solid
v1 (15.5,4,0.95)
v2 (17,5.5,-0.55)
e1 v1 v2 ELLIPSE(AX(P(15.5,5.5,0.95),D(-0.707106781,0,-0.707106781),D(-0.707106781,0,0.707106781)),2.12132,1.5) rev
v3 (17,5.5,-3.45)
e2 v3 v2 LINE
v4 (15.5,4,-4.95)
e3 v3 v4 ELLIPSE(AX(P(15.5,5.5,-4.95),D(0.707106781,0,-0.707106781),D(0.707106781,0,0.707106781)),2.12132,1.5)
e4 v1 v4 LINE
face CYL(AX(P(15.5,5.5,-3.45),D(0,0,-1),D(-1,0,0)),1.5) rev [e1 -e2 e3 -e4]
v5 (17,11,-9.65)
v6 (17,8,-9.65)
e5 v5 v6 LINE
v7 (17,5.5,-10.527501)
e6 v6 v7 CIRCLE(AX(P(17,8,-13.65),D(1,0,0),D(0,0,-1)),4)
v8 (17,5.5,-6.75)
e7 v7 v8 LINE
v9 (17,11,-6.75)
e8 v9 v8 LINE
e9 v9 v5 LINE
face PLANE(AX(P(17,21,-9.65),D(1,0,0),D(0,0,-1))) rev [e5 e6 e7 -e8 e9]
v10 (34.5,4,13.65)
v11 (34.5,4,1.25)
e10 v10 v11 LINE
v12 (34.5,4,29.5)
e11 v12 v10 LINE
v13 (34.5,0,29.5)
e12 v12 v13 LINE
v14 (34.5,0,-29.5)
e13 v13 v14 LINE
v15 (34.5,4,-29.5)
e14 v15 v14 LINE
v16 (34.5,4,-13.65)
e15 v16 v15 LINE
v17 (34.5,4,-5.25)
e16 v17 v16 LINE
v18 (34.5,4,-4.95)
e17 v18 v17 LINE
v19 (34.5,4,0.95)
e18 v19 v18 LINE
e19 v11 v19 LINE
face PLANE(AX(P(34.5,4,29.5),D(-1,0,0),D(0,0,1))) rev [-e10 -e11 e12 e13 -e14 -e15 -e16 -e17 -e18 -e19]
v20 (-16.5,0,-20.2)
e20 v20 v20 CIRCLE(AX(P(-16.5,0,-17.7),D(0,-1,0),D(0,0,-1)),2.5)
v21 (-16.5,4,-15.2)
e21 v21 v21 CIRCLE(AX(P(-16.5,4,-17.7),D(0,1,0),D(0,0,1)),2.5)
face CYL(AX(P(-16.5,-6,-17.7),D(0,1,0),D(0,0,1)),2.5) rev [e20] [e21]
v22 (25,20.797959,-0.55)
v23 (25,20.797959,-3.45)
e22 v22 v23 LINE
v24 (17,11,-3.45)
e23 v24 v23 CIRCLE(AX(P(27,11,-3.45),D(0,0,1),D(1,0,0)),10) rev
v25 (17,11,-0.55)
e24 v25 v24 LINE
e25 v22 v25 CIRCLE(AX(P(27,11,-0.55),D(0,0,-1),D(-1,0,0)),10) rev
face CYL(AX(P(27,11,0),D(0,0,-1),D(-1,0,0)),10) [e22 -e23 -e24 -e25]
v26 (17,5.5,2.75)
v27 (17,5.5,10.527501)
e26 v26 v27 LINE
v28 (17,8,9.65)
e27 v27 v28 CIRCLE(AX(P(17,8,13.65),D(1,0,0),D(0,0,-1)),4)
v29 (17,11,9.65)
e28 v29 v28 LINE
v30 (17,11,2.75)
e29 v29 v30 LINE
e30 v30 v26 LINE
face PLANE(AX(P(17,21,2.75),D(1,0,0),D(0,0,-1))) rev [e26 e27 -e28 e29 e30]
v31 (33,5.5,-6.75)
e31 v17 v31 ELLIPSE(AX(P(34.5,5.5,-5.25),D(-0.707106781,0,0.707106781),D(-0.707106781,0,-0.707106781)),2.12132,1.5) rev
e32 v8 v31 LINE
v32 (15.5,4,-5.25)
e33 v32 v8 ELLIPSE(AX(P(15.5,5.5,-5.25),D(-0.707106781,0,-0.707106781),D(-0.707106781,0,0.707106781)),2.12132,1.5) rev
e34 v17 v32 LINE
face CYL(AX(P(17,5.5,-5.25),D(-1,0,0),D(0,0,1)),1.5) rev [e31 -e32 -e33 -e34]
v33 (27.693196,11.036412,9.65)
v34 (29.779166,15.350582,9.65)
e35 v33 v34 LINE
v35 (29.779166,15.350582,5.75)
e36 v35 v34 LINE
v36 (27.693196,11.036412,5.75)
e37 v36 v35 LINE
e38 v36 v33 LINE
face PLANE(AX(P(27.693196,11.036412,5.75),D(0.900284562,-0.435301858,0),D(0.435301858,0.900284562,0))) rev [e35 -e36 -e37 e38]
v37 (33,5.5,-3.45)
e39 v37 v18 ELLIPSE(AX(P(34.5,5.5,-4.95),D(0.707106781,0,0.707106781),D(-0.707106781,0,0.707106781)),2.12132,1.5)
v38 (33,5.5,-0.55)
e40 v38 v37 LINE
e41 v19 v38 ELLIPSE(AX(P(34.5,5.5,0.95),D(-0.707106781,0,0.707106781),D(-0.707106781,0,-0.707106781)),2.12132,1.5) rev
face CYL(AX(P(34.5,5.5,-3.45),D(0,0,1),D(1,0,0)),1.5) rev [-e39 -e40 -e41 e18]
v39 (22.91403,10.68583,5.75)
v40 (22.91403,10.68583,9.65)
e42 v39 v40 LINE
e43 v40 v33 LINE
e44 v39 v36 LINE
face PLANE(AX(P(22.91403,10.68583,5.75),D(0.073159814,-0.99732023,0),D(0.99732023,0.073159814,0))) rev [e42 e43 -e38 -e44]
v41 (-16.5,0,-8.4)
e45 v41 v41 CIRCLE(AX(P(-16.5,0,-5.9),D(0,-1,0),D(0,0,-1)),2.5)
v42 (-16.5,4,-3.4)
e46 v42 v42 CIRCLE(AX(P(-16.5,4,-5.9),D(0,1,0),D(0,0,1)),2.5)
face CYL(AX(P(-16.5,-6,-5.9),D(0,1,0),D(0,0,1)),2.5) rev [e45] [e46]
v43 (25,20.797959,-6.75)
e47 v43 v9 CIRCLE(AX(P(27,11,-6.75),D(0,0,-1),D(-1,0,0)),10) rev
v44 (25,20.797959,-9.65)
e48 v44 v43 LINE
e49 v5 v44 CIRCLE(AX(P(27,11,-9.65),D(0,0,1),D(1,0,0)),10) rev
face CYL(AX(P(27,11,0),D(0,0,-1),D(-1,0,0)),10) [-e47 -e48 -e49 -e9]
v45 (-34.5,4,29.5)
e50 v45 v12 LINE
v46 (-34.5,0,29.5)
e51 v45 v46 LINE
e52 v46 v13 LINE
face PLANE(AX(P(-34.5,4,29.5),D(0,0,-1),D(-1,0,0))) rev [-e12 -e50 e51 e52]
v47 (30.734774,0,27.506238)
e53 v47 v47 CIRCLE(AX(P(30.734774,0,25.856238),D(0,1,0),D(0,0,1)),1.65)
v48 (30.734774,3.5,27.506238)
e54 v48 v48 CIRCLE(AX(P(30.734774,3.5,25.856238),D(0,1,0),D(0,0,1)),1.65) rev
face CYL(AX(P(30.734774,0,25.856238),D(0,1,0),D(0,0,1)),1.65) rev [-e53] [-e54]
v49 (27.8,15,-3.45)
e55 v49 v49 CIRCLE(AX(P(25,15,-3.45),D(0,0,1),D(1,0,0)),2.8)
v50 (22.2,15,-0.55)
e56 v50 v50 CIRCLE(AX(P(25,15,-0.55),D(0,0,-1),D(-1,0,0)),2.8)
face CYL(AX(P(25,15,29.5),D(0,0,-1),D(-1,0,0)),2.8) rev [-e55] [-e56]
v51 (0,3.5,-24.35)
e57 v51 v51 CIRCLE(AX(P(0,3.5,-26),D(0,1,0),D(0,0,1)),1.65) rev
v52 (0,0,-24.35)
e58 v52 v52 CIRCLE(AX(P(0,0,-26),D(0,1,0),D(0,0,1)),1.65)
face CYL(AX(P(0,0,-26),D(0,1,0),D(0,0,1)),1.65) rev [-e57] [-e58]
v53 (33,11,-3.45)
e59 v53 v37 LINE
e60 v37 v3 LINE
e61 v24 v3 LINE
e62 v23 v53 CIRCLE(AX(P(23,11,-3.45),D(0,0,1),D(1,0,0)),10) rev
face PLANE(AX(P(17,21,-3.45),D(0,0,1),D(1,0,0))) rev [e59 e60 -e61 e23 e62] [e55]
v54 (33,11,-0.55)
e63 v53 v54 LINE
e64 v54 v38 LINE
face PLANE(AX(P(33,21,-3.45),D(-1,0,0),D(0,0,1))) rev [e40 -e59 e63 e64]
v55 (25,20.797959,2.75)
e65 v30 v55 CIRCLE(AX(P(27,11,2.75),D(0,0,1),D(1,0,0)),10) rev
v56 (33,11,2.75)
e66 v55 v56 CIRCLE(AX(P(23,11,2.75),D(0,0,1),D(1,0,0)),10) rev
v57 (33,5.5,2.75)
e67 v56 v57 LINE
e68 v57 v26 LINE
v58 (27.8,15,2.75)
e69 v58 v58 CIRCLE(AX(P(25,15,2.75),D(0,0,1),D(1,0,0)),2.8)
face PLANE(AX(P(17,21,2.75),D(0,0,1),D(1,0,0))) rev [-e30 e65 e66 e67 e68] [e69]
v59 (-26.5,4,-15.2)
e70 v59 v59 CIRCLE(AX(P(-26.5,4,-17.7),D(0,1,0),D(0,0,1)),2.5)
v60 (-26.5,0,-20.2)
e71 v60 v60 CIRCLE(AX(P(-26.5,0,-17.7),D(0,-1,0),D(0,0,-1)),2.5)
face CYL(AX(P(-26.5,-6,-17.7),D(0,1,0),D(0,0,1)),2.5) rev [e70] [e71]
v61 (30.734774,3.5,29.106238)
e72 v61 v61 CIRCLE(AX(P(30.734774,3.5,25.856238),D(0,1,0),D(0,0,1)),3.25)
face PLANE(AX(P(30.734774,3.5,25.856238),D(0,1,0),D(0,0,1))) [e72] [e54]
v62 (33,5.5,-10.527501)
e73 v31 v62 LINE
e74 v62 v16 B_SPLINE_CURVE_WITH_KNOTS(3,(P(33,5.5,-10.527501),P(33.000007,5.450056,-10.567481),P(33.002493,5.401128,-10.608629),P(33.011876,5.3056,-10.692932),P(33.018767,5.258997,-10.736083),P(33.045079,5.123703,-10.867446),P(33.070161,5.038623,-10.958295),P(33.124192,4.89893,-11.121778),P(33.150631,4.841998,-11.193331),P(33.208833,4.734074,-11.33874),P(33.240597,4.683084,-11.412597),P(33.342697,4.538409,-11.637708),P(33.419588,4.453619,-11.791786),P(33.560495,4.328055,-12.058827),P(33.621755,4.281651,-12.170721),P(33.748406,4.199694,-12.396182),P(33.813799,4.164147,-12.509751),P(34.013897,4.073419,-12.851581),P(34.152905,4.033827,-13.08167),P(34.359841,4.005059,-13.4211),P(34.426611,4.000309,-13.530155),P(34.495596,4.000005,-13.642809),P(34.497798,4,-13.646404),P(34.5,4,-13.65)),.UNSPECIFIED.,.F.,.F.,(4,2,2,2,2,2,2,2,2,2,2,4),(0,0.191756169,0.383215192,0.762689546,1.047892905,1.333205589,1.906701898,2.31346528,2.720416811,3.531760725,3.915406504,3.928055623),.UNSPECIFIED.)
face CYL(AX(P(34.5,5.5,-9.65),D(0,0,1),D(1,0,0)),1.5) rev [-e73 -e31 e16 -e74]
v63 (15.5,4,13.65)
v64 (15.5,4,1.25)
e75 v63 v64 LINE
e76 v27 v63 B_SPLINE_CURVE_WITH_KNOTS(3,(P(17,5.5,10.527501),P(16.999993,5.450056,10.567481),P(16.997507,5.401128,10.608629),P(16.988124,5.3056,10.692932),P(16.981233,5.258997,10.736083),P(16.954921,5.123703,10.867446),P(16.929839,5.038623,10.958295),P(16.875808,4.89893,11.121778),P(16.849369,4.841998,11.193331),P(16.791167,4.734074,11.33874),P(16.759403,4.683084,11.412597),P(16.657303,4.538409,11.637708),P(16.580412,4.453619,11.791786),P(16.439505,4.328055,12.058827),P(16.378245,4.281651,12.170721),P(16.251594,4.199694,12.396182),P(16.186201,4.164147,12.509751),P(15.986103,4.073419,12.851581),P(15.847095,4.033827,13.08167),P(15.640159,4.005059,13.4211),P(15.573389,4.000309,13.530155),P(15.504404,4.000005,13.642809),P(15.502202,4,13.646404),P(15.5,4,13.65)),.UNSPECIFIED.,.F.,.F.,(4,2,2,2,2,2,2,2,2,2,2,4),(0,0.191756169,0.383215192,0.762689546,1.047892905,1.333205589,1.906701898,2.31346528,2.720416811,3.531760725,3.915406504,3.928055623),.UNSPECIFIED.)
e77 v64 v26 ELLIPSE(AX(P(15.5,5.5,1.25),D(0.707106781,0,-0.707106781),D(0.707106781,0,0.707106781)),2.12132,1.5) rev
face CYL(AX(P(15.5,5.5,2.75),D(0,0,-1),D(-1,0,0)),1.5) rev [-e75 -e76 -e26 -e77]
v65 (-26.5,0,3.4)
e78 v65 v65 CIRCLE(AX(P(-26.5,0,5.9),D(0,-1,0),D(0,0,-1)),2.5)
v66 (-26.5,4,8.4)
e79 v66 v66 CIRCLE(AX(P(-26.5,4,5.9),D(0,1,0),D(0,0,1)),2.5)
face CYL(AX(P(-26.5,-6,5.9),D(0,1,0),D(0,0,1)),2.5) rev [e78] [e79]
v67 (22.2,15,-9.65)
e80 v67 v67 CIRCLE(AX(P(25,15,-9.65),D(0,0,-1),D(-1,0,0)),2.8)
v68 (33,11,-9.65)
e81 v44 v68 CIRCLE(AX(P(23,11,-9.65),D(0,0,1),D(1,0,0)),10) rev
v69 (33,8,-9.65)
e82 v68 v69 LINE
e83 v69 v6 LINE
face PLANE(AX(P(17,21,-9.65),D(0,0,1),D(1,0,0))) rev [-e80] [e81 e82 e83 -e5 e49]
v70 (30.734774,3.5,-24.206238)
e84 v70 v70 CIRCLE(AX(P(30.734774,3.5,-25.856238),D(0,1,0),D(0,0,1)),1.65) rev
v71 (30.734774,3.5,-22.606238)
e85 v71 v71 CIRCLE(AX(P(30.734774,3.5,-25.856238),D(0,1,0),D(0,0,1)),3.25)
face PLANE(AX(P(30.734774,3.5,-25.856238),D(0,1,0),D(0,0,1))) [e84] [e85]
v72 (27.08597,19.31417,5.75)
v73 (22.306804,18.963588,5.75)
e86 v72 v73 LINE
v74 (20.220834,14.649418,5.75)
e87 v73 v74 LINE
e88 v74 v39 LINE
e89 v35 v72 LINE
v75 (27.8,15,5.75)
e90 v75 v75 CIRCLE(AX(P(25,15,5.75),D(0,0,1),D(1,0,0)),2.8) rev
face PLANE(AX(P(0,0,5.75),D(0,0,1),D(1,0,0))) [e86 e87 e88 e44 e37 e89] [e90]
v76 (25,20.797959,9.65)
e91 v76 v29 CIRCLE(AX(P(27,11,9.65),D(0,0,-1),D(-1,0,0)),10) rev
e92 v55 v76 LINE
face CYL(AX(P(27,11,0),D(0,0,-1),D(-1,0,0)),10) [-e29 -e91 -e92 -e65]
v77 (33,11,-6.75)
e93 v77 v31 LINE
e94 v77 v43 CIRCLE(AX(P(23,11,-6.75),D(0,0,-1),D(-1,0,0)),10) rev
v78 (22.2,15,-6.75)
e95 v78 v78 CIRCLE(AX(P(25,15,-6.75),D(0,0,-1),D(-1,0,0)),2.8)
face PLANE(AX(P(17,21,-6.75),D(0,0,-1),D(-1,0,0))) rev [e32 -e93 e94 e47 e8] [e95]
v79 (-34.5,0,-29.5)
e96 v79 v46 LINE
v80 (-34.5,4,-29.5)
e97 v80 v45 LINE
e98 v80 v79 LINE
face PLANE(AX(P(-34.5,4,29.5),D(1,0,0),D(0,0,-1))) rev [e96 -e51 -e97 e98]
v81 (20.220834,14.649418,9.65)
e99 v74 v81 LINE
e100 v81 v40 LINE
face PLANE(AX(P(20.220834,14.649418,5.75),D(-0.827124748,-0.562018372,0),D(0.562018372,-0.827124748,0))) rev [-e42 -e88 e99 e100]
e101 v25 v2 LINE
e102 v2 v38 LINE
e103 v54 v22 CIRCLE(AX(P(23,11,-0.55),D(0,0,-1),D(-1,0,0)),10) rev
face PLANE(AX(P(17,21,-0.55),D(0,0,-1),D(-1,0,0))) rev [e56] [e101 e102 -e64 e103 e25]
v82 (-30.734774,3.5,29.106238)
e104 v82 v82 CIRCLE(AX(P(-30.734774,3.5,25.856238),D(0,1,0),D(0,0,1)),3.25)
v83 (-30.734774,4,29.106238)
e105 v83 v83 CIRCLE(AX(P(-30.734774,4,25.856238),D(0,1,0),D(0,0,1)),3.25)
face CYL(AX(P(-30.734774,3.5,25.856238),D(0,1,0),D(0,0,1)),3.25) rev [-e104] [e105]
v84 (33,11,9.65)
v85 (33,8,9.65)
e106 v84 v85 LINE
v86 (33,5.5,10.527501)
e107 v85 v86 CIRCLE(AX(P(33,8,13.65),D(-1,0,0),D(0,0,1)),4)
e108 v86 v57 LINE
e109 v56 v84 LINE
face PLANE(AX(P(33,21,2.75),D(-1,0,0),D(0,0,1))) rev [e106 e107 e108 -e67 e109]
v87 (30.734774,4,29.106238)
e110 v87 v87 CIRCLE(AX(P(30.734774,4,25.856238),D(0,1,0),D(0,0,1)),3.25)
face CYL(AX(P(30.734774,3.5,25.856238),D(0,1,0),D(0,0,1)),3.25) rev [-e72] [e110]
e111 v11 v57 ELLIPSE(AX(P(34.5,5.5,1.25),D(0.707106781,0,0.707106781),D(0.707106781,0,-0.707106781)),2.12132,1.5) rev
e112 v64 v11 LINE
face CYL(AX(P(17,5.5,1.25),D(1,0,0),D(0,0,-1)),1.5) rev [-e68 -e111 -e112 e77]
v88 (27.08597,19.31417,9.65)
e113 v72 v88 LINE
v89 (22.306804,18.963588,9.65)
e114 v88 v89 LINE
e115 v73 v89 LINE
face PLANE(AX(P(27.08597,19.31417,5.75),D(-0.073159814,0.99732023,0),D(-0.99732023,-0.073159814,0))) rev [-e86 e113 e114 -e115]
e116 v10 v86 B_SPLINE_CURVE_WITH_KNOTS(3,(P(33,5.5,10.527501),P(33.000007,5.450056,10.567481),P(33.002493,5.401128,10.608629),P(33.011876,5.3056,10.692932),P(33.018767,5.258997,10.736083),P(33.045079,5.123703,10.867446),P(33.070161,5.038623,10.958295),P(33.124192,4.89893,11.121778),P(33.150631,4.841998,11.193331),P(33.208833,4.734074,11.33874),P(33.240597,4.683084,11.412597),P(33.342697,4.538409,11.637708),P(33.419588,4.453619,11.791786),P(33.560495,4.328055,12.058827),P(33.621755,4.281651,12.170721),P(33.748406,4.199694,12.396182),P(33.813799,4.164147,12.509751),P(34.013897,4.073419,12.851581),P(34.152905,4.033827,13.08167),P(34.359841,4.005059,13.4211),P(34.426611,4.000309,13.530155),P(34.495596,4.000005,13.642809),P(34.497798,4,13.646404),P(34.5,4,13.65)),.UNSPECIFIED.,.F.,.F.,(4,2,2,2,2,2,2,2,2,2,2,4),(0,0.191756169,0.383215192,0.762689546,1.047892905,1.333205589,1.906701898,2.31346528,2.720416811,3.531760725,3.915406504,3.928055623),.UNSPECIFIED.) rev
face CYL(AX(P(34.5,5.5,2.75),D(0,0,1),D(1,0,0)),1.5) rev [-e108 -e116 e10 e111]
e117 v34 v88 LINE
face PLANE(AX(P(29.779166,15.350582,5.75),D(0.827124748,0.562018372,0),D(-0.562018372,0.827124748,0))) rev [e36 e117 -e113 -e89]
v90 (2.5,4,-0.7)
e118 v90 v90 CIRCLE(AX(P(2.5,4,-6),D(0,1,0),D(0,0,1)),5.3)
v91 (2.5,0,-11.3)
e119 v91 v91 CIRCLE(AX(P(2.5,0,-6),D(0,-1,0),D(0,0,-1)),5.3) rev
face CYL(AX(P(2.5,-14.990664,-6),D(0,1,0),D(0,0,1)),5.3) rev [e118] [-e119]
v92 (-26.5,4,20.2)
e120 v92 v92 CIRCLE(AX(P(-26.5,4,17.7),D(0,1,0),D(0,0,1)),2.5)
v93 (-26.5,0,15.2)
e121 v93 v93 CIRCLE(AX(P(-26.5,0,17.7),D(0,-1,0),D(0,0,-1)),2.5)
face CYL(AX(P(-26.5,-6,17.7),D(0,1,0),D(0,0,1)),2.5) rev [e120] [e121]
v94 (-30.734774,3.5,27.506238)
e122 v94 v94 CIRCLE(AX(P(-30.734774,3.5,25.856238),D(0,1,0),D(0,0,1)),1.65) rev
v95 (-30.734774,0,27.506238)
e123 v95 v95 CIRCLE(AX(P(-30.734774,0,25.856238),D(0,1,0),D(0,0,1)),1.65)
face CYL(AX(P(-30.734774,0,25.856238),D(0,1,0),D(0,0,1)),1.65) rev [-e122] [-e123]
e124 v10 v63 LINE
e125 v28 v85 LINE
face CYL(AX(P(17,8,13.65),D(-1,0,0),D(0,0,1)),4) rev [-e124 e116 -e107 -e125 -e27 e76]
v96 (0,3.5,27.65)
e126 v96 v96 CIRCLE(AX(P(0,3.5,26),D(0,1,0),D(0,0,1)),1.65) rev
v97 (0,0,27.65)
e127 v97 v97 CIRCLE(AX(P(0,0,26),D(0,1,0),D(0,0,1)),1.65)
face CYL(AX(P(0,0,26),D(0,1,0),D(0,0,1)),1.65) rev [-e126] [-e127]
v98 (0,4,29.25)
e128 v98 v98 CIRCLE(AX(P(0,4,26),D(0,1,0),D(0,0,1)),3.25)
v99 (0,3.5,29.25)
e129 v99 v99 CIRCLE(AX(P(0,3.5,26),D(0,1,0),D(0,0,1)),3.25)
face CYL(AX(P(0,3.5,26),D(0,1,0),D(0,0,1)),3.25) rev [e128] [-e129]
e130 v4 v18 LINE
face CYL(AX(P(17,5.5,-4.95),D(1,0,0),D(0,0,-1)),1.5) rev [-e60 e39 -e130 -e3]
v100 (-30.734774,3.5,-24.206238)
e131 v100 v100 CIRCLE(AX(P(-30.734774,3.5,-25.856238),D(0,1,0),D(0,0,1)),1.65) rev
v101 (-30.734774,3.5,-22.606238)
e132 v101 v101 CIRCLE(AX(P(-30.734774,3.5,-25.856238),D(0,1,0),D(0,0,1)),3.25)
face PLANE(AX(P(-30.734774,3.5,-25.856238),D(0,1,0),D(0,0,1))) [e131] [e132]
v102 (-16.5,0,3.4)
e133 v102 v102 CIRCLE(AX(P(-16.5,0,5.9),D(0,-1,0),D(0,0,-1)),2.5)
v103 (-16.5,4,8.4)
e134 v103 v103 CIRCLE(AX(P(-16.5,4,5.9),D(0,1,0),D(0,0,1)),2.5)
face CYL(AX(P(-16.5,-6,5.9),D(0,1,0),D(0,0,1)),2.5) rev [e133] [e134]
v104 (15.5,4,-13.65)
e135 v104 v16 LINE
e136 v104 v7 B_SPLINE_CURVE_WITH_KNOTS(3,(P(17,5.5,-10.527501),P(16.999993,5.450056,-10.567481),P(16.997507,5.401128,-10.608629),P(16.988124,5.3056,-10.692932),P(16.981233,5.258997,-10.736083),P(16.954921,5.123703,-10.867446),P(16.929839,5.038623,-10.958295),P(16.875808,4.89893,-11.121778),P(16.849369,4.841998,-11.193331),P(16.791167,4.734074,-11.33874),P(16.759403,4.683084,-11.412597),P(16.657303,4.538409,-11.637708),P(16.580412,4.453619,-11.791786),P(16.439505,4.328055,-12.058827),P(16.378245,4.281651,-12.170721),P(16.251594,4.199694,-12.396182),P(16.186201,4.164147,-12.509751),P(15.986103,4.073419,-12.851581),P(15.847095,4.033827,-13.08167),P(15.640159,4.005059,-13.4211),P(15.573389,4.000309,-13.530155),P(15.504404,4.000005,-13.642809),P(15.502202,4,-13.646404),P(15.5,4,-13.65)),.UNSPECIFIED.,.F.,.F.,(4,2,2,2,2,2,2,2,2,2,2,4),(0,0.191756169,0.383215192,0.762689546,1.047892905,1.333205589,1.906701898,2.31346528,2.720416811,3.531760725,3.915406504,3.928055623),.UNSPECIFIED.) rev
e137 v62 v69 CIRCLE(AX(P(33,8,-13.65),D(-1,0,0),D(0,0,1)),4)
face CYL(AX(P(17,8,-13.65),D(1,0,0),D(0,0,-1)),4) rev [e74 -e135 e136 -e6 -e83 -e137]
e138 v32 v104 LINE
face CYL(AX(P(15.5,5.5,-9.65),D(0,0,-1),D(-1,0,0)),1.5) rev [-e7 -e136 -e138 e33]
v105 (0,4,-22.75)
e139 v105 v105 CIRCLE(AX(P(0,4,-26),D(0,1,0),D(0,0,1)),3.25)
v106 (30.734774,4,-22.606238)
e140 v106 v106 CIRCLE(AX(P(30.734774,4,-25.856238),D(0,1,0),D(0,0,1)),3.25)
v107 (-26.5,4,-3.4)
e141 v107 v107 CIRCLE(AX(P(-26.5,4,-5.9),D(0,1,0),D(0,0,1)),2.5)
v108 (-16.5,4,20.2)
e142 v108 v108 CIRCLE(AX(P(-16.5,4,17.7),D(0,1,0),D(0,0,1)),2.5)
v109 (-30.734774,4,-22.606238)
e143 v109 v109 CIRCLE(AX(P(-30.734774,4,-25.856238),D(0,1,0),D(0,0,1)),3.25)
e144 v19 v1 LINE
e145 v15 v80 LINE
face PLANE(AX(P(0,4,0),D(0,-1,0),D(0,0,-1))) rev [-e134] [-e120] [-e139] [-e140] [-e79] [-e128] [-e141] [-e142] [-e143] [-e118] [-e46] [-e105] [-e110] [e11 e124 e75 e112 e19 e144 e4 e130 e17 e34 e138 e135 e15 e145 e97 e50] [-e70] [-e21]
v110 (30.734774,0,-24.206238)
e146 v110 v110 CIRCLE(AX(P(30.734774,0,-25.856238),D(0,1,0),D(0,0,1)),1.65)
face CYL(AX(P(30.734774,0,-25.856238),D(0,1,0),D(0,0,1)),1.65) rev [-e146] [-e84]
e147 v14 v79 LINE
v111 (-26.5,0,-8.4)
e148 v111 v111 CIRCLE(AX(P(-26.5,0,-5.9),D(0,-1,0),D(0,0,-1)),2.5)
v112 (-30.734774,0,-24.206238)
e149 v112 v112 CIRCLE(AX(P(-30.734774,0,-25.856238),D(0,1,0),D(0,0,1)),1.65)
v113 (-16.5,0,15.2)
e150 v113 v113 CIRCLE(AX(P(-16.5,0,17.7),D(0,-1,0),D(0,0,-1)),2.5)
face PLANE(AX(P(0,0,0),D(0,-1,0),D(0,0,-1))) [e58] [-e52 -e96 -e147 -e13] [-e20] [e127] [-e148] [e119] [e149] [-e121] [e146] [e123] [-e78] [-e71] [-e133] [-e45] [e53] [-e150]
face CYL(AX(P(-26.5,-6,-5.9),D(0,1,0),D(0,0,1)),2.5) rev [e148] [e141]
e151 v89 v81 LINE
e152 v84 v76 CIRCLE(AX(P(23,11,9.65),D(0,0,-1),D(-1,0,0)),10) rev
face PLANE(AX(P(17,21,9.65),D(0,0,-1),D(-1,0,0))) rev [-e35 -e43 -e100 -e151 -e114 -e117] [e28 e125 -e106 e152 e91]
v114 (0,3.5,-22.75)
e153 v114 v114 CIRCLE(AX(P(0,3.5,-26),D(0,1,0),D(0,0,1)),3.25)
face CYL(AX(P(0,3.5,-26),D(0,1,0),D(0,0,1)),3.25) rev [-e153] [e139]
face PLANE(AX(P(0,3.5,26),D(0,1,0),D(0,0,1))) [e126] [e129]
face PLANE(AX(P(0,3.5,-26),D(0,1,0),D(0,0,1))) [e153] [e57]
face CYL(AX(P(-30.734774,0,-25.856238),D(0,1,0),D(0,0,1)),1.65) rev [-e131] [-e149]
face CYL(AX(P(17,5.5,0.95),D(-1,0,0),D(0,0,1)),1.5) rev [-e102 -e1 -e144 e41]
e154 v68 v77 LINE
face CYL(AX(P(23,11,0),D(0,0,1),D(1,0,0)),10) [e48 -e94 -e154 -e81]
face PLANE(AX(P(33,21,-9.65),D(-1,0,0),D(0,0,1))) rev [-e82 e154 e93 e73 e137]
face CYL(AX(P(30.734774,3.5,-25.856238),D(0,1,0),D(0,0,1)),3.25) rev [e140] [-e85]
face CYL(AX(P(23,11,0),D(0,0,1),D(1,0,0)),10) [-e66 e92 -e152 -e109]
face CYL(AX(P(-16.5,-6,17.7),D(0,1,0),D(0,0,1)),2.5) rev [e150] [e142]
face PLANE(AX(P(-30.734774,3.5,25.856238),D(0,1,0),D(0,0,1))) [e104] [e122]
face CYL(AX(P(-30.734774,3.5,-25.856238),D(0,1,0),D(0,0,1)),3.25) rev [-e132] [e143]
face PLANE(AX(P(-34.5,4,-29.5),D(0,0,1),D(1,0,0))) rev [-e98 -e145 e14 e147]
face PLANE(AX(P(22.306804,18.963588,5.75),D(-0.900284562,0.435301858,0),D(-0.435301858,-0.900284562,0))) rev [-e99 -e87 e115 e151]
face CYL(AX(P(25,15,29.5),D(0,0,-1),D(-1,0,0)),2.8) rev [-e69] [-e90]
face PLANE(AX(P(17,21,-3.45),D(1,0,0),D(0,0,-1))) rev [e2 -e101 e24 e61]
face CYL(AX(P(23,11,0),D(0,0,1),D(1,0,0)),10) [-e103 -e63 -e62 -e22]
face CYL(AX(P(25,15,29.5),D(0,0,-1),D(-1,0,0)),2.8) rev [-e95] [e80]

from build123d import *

# Parameters (mm, degrees)
SKETCH_1_W          = 69
SKETCH_1_H          = 59
EXTRUDE_1_DEPTH     = 4
SKETCH_2_R          = 1.65
CUT_EXTRUDE_1_DEPTH = 4
SKETCH_3_R          = 3.25
CUT_EXTRUDE_2_DEPTH = 0.5
SKETCH_4_W          = 16
SKETCH_4_H          = 2.9
SKETCH_4_H_2        = 6.9
EXTRUDE_2_DEPTH     = 17
SKETCH_5_R          = 2.8
CUT_EXTRUDE_3_DEPTH = 57.249199994
FILLET_1_R          = 10
FILLET_2_R          = 4
CUT_EXTRUDE_4_DEPTH = 3.9
FILLET_3_R          = 1.5
SKETCH_7_R          = 5.3
CUT_EXTRUDE_5_DEPTH = 4
SKETCH_8_R          = 2.5
CUT_EXTRUDE_6_DEPTH = 10


# Some blends are built 0.0001 mm under size
with BuildPart() as part:
    # Эскиз1 → Бобышка-Вытянуть1 (new body)
    with BuildSketch(Plane(origin=(0, 0, 0), x_dir=(1, 0, 0), z_dir=(0, 1, 0))):
        Rectangle(SKETCH_1_W, SKETCH_1_H)
    extrude(amount=EXTRUDE_1_DEPTH)

    # Эскиз2 → Вырез-Вытянуть1 (cut)
    with BuildSketch(Plane(origin=(0, 4, 0), x_dir=(1, 0, 0), z_dir=(0, 1, 0))):
        with Locations(Location((-30.734773913, -25.856238371, 0), (0, 0, 270))):
            Circle(SKETCH_2_R)
        with Locations(Location((-30.734773913, 25.856238371, 0), (0, 0, 270))):
            Circle(SKETCH_2_R)
        with Locations(Location((0, 26, 0), (0, 0, 270))):
            Circle(SKETCH_2_R)
        with Locations(Location((30.734773913, 25.856238371, 0), (0, 0, 270))):
            Circle(SKETCH_2_R)
        with Locations(Location((30.734773913, -25.856238371, 0), (0, 0, 270))):
            Circle(SKETCH_2_R)
        with Locations(Location((0, -26, 0), (0, 0, 270))):
            Circle(SKETCH_2_R)
    extrude(amount=-CUT_EXTRUDE_1_DEPTH, mode=Mode.SUBTRACT)

    # Эскиз3 → Вырез-Вытянуть2 (cut)
    with BuildSketch(Plane(origin=(0, 4, 0), x_dir=(1, 0, 0), z_dir=(0, 1, 0))):
        with Locations(Location((-30.734773913, 25.856238371, 0), (0, 0, 270))):
            Circle(SKETCH_3_R)
        with Locations(Location((0, 26, 0), (0, 0, 270))):
            Circle(SKETCH_3_R)
        with Locations(Location((30.734773913, 25.856238371, 0), (0, 0, 270))):
            Circle(SKETCH_3_R)
        with Locations(Location((30.734773913, -25.856238371, 0), (0, 0, 270))):
            Circle(SKETCH_3_R)
        with Locations(Location((0, -26, 0), (0, 0, 270))):
            Circle(SKETCH_3_R)
        with Locations(Location((-30.734773913, -25.856238371, 0), (0, 0, 270))):
            Circle(SKETCH_3_R)
    extrude(amount=-CUT_EXTRUDE_2_DEPTH, mode=Mode.SUBTRACT)

    # Эскиз4 → Бобышка-Вытянуть2 (add)
    with BuildSketch(Plane(origin=(0, 4, 0), x_dir=(1, 0, 0), z_dir=(0, 1, 0))):
        with Locations((25, 8.2)):
            Rectangle(SKETCH_4_W, SKETCH_4_H)
        with Locations((25, 2)):
            Rectangle(SKETCH_4_W, SKETCH_4_H)
        with Locations((25, -6.2)):
            Rectangle(SKETCH_4_W, SKETCH_4_H_2)
    extrude(amount=EXTRUDE_2_DEPTH)

    # Эскиз5 → Вырез-Вытянуть3 (cut, through all)
    with BuildSketch(Plane(origin=(0, 0, -9.65), x_dir=(-1, 0, 0), z_dir=(0, 0, -1))):
        with Locations((-25, 15)):
            Circle(SKETCH_5_R)
    extrude(amount=-CUT_EXTRUDE_3_DEPTH, mode=Mode.SUBTRACT)

    # Скругление1
    # the kernel refuses this fillet: 10 mm, written as the material it takes off along each edge
    with BuildSketch(Plane(origin=(33, 21, -34.65), x_dir=(0, -1, 0), z_dir=(0, 0, 1)), Plane(origin=(17, 21, 18.25), x_dir=(0, -1, 0), z_dir=(0, 0, -1)), Plane(origin=(17, 21, 24.45), x_dir=(0, -1, 0), z_dir=(0, 0, -1)), Plane(origin=(33, 21, -28.45), x_dir=(0, -1, 0), z_dir=(0, 0, 1))) as fillet_1_piece_1:
        with BuildLine():
            CenterArc((FILLET_1_R, -FILLET_1_R), FILLET_1_R, 90, 90)
            Line((0, -FILLET_1_R), (0, 0))
            Line((0, 0), (FILLET_1_R, 0))
        make_face()
    extrude(amount=52.9, mode=Mode.SUBTRACT)
    with BuildSketch(Plane(origin=(33, 21, -22.25), x_dir=(0, -1, 0), z_dir=(0, 0, 1)), Plane(origin=(17, 21, 34.65), x_dir=(0, -1, 0), z_dir=(0, 0, -1))) as fillet_1_piece_2:
        with BuildLine():
            CenterArc((FILLET_1_R, -FILLET_1_R), FILLET_1_R, 90, 90)
            Line((0, -FILLET_1_R), (0, 0))
            Line((0, 0), (FILLET_1_R, 0))
        make_face()
    extrude(amount=56.9, mode=Mode.SUBTRACT)

    # Скругление2
    fillet_2_edges = [part.edges().sort_by_distance(p)[0] for p in [
        (25, 4, 9.65),
        (25, 4, -9.65),
    ]]
    fillet(fillet_2_edges, radius=FILLET_2_R)

    # Эскиз6 → Вырез-Вытянуть4 (cut)
    with BuildSketch(Plane.XY.offset(9.65)):
        Polygon((20.220834242, 14.649417644), (22.914030347, 10.685829867), (27.693196105, 11.036412222), (29.779165758, 15.350582356), (27.085969653, 19.314170133), (22.306803895, 18.963587778), align=None)
    extrude(amount=-CUT_EXTRUDE_4_DEPTH, mode=Mode.SUBTRACT)

    # Скругление3
    fillet_3_edges = [part.edges().sort_by_distance(p)[0] for p in [
        (33, 4, 8.2),
        (25, 4, 2.75),
        (17, 4, 8.2),
        (33, 4, -10.2),
        (17, 4, -10.2),
        (25, 4, -6.75),
        (33, 4, -2),
        (25, 4, -3.45),
        (17, 4, -2),
        (25, 4, -0.55),
    ]]
    fillet(fillet_3_edges, radius=FILLET_3_R - 0.0001)  # a hair under: the kernel refuses the full size

    # Эскиз7 → Вырез-Вытянуть5 (cut)
    with BuildSketch(Plane(origin=(0, 4, 0), x_dir=(1, 0, 0), z_dir=(0, 1, 0))):
        with Locations(Location((2.5, 6, 0), (0, 0, 270))):
            Circle(SKETCH_7_R)
    extrude(amount=-CUT_EXTRUDE_5_DEPTH, mode=Mode.SUBTRACT)

    # Эскиз8 → Вырез-Вытянуть6 (cut)
    with BuildSketch(Plane(origin=(0, 4, 0), x_dir=(1, 0, 0), z_dir=(0, 1, 0))):
        with Locations(Location((-26.5, 17.7, 0), (0, 0, 270))):
            Circle(SKETCH_8_R)
        with Locations(Location((-26.5, 5.9, 0), (0, 0, 270))):
            Circle(SKETCH_8_R)
        with Locations(Location((-26.5, -5.9, 0), (0, 0, 270))):
            Circle(SKETCH_8_R)
        with Locations(Location((-26.5, -17.7, 0), (0, 0, 270))):
            Circle(SKETCH_8_R)
        with Locations(Location((-16.5, 17.7, 0), (0, 0, 270))):
            Circle(SKETCH_8_R)
        with Locations(Location((-16.5, 5.9, 0), (0, 0, 270))):
            Circle(SKETCH_8_R)
        with Locations(Location((-16.5, -5.9, 0), (0, 0, 270))):
            Circle(SKETCH_8_R)
        with Locations(Location((-16.5, -17.7, 0), (0, 0, 270))):
            Circle(SKETCH_8_R)
    extrude(amount=-CUT_EXTRUDE_6_DEPTH, mode=Mode.SUBTRACT)


solid = part.part
